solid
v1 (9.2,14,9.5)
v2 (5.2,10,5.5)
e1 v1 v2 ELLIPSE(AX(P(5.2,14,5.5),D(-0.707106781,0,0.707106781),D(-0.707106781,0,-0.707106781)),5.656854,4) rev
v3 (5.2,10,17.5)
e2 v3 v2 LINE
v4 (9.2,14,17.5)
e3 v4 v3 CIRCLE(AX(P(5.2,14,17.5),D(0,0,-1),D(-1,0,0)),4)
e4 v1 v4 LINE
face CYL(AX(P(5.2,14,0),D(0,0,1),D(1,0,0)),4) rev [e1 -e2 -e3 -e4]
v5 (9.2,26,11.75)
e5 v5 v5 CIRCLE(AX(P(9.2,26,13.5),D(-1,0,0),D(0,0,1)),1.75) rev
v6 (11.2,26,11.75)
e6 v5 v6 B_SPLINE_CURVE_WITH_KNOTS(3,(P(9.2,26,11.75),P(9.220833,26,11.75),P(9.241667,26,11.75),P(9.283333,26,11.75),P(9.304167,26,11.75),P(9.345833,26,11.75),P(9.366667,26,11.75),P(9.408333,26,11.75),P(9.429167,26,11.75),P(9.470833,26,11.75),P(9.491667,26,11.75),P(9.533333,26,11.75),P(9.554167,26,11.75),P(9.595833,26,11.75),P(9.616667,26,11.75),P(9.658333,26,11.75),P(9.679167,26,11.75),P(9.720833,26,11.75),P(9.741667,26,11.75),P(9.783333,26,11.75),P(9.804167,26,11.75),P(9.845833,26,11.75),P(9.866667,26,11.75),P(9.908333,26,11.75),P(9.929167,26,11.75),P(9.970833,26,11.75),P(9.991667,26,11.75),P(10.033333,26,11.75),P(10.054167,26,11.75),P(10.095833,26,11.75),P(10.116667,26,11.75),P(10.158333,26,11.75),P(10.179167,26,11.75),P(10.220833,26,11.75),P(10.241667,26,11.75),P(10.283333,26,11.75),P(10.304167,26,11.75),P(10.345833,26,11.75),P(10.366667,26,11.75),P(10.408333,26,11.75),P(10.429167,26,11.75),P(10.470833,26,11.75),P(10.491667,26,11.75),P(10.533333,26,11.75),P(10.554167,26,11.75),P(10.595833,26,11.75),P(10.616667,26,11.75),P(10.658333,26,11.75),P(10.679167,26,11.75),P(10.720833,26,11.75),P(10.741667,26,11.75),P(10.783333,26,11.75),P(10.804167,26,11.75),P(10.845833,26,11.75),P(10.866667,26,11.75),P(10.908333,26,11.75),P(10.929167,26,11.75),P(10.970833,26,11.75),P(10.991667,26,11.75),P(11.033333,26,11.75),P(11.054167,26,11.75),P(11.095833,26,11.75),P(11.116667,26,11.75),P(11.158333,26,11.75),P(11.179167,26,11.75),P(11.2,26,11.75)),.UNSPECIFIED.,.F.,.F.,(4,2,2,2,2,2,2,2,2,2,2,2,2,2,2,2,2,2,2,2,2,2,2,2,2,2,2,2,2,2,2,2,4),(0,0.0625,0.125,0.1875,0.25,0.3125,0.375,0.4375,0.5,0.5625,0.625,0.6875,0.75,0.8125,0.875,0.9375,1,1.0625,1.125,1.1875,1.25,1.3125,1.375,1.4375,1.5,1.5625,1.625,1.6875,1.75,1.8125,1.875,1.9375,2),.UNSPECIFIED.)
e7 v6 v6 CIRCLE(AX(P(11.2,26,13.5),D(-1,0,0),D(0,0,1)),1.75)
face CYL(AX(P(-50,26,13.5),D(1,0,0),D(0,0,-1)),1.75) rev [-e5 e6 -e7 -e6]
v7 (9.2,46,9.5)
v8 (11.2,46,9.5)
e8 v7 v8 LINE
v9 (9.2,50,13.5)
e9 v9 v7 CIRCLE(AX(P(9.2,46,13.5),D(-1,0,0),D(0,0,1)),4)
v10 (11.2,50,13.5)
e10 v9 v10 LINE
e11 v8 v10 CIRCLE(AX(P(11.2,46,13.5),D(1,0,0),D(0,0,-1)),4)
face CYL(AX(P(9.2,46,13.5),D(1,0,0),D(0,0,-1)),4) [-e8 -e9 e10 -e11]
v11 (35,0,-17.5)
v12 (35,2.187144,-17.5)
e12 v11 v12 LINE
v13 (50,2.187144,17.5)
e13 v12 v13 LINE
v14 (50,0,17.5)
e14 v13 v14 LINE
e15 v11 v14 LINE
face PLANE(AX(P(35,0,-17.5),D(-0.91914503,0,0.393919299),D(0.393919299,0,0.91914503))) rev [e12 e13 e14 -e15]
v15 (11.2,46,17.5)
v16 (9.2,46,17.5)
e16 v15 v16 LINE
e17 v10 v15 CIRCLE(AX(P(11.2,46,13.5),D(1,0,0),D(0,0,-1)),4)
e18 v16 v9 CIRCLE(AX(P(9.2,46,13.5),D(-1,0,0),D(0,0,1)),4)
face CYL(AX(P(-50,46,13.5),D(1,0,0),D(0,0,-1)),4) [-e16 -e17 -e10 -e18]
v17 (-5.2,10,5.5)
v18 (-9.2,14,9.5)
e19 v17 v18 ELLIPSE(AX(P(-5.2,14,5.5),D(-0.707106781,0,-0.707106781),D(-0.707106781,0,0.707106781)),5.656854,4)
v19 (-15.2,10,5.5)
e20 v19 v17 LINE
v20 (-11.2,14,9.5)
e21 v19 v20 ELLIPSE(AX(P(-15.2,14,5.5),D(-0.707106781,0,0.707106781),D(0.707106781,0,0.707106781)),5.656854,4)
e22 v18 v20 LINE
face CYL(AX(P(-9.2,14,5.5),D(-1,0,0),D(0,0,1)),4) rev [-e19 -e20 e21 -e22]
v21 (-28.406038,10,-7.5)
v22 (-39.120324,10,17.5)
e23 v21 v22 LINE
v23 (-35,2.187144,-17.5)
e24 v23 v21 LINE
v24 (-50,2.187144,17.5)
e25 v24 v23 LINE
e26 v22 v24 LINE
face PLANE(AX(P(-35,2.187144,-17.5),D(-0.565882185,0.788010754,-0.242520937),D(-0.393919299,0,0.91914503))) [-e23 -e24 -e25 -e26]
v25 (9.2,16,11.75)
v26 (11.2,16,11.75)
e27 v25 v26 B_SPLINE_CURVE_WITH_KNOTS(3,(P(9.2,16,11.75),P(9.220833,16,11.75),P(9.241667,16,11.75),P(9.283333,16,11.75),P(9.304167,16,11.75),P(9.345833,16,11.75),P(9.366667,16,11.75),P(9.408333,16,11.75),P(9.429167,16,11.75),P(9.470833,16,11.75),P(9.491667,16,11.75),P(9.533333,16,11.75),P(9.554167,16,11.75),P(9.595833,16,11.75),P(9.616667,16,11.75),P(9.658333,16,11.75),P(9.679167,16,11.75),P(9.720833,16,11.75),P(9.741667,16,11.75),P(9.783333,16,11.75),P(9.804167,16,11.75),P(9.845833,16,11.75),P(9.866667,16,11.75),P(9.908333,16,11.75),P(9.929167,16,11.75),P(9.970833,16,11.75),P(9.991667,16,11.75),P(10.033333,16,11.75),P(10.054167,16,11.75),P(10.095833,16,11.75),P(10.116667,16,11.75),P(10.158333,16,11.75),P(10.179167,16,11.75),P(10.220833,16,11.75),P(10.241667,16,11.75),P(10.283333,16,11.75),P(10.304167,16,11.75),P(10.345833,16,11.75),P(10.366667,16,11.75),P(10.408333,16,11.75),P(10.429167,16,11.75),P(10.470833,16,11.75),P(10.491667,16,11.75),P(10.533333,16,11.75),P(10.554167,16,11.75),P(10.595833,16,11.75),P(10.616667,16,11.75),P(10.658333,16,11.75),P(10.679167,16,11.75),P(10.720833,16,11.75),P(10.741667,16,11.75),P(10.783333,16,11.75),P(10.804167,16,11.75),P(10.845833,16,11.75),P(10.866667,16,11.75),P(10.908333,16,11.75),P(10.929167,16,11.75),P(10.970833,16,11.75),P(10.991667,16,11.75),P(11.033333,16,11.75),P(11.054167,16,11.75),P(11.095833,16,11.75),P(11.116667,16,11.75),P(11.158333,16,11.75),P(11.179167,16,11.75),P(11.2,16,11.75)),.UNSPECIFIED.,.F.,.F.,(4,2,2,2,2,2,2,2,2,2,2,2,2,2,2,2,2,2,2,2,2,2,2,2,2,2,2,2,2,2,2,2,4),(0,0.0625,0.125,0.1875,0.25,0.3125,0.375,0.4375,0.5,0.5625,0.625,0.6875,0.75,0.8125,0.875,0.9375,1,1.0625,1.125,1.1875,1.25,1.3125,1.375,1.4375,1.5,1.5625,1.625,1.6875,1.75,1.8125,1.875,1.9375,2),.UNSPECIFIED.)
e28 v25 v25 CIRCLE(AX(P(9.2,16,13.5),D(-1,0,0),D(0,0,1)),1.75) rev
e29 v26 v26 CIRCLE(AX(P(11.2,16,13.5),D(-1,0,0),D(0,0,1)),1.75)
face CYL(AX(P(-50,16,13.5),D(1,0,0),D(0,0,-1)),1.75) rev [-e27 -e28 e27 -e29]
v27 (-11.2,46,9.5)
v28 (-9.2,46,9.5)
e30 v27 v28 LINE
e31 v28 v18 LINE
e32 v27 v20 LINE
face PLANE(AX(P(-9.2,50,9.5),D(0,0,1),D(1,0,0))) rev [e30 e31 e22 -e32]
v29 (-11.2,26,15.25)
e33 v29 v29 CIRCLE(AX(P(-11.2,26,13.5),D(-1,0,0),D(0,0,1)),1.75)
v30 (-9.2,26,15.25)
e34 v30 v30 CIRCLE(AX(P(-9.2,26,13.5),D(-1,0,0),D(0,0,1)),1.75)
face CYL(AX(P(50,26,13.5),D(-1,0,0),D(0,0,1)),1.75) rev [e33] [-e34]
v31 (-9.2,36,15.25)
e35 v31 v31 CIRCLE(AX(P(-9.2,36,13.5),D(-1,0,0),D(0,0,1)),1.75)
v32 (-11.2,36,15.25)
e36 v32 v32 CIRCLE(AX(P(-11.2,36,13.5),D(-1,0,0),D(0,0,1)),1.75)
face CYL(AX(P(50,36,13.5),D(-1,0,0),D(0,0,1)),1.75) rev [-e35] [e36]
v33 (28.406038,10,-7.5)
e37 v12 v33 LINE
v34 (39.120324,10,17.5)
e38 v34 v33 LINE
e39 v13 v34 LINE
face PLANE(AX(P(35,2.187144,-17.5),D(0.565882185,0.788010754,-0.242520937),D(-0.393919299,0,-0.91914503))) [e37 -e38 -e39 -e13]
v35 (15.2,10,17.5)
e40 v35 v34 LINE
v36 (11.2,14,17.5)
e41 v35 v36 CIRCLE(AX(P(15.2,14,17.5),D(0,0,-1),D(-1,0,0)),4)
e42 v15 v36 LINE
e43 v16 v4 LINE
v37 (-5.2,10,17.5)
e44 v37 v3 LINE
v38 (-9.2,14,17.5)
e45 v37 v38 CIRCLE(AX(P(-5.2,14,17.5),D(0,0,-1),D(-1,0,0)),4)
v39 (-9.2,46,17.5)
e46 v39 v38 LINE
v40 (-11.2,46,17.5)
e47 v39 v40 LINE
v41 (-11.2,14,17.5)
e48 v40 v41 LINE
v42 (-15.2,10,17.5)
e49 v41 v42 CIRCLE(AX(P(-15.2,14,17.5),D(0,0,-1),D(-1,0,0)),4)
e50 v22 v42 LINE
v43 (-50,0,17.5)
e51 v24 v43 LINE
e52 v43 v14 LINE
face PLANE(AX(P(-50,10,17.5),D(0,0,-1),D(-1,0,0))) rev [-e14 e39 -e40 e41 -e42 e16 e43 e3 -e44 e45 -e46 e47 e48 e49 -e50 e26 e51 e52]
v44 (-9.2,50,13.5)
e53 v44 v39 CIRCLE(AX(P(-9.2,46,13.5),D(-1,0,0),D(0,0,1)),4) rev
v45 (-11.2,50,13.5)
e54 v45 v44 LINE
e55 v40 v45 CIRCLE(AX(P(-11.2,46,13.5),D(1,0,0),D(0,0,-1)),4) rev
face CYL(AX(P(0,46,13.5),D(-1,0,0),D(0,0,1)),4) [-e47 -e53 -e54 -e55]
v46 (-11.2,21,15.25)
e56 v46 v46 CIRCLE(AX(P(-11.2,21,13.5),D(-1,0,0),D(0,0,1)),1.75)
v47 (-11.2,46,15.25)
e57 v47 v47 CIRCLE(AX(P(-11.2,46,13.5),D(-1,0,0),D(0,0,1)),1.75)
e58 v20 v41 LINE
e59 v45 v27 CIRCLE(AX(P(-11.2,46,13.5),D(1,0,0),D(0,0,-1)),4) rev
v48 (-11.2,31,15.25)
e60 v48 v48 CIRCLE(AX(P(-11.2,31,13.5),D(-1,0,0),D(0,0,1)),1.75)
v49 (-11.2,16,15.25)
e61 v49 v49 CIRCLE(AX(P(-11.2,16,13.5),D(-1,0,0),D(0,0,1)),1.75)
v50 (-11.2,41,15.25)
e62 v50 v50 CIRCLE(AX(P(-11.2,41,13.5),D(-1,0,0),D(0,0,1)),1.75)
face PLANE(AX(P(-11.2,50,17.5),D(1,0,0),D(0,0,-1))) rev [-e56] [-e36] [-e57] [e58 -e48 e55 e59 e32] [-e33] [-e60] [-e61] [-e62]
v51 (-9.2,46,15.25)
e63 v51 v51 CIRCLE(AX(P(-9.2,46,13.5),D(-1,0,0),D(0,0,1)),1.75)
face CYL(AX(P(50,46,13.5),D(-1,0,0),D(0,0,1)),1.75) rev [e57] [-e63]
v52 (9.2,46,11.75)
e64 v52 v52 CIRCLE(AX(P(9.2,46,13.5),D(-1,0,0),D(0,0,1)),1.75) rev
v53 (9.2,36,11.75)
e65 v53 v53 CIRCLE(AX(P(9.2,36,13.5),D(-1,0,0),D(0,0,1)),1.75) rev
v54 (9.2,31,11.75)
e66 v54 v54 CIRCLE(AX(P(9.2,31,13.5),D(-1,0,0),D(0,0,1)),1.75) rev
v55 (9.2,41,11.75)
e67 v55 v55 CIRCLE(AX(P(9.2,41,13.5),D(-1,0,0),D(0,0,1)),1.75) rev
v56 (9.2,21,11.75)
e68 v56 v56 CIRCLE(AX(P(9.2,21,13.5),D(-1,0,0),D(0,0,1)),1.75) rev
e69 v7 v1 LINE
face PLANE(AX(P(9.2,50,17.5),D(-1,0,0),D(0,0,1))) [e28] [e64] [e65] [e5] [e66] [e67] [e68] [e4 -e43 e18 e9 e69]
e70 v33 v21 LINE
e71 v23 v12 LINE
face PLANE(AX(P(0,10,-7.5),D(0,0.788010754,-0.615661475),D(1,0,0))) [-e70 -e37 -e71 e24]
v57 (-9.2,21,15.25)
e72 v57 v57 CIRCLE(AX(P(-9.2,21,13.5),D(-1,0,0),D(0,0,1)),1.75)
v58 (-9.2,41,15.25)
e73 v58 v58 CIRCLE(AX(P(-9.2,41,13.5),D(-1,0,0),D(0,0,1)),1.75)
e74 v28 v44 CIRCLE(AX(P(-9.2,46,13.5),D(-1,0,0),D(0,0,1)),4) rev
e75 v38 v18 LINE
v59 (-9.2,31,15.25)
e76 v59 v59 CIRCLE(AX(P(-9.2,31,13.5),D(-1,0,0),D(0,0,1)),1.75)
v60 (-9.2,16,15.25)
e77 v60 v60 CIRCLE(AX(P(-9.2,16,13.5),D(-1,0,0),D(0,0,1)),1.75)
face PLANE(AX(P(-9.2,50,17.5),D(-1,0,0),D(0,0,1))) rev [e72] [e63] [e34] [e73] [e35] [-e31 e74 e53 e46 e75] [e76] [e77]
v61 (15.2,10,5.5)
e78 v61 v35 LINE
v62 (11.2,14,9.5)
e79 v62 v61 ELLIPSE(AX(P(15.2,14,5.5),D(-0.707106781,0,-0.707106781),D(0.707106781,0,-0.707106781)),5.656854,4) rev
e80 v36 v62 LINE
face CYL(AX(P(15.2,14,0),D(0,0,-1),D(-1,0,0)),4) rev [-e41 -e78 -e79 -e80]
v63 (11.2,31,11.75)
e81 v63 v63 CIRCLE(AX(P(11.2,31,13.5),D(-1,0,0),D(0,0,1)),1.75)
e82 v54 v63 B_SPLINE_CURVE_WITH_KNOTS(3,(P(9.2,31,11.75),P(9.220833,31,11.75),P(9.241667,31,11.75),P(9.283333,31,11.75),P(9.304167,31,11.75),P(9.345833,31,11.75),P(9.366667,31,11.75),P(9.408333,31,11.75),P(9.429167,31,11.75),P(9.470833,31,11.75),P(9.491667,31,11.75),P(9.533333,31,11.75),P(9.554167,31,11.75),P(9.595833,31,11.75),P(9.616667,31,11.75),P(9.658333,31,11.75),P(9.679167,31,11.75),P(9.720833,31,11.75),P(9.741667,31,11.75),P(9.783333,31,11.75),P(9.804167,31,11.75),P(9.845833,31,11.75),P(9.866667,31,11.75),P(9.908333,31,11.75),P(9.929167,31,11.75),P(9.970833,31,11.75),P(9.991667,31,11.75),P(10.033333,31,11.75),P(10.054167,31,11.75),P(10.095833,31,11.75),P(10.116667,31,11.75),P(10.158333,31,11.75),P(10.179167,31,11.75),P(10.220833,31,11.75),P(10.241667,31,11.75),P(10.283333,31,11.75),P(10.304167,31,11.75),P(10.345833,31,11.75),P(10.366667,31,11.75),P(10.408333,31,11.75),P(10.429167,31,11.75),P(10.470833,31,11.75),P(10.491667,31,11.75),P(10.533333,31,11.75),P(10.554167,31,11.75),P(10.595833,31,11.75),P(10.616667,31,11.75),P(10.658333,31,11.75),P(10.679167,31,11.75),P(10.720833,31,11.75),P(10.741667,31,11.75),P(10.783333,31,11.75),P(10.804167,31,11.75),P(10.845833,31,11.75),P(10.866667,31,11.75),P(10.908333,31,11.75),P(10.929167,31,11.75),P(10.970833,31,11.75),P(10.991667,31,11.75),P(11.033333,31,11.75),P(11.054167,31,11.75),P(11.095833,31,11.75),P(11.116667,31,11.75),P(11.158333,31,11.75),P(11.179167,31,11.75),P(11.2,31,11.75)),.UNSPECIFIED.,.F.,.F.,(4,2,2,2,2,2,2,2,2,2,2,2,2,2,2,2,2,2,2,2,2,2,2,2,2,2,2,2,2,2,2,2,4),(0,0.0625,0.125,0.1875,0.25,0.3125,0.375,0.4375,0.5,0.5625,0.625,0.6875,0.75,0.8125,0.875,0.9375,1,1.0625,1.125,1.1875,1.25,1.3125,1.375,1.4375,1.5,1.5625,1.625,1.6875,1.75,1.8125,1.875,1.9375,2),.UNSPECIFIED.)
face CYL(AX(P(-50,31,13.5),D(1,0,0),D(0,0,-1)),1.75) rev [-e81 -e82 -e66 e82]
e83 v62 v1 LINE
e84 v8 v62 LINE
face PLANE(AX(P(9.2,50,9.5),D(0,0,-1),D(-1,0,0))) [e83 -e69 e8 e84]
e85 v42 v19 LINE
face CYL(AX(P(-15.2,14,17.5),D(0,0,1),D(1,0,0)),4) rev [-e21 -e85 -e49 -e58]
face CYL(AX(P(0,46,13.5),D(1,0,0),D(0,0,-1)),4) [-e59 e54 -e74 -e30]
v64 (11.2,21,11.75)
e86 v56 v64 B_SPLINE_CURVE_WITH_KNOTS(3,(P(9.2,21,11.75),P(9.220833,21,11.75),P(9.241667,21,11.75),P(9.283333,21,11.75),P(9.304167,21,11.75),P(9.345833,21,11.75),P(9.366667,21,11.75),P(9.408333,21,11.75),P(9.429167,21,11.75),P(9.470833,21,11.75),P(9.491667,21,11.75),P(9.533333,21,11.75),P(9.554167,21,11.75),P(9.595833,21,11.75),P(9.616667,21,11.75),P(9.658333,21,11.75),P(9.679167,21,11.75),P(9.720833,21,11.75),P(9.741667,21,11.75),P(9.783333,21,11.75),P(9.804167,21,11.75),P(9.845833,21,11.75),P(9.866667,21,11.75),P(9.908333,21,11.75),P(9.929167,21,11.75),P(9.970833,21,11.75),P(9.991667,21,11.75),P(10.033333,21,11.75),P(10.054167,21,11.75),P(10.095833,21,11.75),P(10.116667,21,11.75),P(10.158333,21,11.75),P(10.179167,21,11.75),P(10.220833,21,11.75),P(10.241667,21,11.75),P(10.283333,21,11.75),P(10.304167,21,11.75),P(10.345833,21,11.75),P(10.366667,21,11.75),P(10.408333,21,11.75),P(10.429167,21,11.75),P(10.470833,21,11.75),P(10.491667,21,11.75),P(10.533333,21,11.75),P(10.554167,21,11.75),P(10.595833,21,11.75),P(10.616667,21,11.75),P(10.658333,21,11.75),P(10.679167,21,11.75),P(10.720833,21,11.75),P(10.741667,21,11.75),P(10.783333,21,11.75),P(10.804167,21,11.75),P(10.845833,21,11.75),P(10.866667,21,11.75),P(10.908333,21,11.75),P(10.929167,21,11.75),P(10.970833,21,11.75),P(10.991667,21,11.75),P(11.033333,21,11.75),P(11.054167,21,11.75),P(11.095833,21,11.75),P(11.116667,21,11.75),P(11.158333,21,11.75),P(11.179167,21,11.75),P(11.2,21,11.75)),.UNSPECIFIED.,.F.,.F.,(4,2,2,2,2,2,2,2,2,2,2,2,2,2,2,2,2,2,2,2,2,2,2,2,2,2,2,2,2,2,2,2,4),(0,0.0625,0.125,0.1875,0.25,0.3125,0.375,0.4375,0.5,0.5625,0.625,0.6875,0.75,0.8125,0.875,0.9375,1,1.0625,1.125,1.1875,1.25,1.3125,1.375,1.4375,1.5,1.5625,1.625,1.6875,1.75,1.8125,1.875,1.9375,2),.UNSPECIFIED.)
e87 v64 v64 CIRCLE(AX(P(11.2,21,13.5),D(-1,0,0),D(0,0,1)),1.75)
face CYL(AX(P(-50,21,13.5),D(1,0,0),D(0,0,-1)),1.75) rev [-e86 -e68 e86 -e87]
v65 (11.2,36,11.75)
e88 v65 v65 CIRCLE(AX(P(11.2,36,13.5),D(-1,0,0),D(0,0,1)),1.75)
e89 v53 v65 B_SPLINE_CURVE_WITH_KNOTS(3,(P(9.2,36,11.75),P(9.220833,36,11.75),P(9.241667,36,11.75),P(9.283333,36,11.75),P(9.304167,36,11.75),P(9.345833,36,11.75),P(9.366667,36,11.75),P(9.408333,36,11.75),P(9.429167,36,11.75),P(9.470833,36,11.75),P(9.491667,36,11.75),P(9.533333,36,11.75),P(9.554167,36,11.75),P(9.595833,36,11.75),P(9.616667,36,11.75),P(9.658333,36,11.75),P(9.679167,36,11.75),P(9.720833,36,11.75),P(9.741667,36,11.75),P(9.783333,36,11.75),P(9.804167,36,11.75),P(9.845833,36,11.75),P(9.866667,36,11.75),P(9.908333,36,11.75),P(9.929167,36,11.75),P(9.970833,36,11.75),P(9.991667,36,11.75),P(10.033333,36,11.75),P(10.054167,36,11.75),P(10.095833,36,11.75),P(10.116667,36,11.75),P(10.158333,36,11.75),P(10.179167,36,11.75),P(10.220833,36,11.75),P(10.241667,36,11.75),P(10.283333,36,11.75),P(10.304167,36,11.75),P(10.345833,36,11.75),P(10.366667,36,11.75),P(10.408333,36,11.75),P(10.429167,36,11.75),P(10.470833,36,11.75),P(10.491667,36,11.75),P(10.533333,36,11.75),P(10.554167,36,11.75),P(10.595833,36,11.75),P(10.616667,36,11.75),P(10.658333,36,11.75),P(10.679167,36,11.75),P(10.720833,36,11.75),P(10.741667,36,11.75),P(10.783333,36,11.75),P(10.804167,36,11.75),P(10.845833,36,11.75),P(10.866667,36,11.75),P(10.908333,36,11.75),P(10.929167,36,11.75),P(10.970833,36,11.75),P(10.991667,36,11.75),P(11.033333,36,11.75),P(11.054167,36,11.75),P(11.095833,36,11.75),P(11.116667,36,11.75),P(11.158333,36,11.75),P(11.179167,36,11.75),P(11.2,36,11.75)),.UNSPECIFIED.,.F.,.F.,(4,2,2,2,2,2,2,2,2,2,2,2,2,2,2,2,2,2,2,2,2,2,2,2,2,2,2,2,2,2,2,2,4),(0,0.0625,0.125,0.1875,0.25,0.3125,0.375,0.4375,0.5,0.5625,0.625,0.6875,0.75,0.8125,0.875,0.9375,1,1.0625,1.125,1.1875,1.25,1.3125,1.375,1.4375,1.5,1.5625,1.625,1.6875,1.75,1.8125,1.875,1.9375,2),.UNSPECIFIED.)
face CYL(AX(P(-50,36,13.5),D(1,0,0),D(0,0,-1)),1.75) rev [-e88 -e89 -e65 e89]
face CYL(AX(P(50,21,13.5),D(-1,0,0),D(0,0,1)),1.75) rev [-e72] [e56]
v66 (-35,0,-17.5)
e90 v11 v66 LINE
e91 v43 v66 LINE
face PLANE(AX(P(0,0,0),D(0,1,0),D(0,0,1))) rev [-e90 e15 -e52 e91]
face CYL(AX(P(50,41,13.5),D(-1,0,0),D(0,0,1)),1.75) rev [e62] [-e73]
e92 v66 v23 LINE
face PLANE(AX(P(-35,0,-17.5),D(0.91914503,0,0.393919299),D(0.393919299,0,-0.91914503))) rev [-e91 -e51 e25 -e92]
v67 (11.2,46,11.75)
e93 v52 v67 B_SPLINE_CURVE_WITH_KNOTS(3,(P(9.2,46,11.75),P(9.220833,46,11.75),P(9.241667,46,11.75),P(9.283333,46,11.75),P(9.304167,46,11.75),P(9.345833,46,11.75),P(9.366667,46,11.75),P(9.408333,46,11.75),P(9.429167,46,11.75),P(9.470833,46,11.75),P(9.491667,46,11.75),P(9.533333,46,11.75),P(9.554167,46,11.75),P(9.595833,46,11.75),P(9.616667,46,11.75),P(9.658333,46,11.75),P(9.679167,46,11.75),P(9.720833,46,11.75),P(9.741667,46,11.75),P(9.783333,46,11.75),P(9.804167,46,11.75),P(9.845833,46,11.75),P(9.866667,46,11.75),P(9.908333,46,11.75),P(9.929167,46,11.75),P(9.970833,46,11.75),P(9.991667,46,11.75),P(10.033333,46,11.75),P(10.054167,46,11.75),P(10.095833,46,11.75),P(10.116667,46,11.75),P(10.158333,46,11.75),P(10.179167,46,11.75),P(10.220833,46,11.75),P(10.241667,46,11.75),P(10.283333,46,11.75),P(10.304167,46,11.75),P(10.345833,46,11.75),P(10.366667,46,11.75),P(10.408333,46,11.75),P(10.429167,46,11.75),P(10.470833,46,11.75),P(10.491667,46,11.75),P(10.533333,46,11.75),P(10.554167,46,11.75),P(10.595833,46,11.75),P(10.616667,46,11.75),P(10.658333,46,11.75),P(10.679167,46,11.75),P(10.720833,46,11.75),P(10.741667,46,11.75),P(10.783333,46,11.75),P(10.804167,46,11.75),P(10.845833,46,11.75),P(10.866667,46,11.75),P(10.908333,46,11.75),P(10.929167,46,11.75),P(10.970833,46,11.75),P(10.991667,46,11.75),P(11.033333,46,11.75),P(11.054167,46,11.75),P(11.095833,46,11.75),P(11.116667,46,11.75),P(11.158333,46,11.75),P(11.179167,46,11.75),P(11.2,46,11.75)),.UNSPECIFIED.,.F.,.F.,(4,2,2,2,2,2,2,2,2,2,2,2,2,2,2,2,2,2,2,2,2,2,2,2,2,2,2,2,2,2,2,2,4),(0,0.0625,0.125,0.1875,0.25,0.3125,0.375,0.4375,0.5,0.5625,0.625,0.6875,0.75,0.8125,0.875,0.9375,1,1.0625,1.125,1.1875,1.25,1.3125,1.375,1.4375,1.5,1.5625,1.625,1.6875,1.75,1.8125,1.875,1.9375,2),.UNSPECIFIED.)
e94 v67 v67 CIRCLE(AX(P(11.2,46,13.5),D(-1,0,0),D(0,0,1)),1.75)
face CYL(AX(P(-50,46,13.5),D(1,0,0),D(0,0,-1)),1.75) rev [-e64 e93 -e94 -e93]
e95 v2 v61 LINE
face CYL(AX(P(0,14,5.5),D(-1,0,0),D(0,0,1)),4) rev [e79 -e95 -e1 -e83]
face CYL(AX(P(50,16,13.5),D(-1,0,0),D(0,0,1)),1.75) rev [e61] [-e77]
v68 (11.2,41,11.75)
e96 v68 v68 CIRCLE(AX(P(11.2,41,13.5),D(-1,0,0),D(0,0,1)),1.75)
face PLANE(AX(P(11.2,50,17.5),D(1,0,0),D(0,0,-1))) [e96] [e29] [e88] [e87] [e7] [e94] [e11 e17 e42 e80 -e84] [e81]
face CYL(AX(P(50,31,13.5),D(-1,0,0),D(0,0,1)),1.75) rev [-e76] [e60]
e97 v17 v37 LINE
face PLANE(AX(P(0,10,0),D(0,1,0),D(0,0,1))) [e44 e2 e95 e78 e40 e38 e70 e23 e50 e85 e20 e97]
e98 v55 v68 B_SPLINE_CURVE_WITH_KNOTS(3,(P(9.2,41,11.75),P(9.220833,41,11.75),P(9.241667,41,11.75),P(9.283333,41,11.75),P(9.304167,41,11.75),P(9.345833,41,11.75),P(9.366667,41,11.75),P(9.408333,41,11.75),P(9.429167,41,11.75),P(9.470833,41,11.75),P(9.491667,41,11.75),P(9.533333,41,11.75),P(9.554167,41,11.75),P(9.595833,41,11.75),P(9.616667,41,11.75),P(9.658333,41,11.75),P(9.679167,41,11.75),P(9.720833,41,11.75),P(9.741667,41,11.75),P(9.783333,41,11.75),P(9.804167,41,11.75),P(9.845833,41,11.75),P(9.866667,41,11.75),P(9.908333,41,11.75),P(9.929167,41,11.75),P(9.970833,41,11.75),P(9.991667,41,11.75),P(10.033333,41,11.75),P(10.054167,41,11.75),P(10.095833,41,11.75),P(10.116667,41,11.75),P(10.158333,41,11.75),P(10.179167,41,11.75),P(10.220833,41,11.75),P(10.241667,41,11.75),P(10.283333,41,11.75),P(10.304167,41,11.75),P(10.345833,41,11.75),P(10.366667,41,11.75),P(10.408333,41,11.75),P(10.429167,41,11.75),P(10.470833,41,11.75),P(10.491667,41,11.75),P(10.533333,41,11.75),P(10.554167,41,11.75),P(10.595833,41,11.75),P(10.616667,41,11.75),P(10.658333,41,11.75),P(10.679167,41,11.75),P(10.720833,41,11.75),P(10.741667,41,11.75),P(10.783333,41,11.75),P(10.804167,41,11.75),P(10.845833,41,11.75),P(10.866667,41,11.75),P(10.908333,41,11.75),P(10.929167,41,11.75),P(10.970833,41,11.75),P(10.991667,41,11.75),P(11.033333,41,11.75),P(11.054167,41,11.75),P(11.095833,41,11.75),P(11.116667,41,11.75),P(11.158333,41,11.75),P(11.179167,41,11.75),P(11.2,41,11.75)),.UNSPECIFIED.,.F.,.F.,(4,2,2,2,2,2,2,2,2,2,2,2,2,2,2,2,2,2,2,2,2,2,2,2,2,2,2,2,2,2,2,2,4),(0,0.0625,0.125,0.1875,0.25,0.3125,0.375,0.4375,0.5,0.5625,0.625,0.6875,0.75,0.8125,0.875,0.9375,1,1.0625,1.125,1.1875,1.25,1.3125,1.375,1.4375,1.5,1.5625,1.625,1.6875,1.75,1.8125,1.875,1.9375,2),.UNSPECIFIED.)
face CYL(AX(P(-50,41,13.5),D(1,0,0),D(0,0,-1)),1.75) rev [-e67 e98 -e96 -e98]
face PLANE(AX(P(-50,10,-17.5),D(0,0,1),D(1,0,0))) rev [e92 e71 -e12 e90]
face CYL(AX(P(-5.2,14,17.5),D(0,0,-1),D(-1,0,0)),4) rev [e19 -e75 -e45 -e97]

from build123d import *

# Parameters (mm, degrees)
SKETCH1_W               = 100
SKETCH1_H               = 35
BOSS_EXTRUDE1_DEPTH     = 10
CUT_EXTRUDE1_DEPTH      = 54.909646632
CHAMFER1_SIZE           = 10
CHAMFER1_SIZE2          = 7.812856265
SKETCH3_W               = 2
SKETCH3_H               = 8
BOSS_EXTRUDE2_DEPTH     = 40
FILLET1_R               = 4
SKETCH4_R               = 1.75
CUT_EXTRUDE2_DEPTH      = 81.942510463
LPATTERN1_COUNT         = 7
LPATTERN1_PITCH         = 5
MIRROR1_COPY_1_SKETCH_R = 1.75
MIRROR1_COPY_1_DEPTH    = 81.942510463
MIRROR1_COPY_2_SKETCH_R = 1.75
MIRROR1_COPY_2_DEPTH    = 81.942510463
MIRROR1_COPY_3_SKETCH_R = 1.75
MIRROR1_COPY_3_DEPTH    = 81.942510463
MIRROR1_COPY_4_SKETCH_R = 1.75
MIRROR1_COPY_4_DEPTH    = 81.942510463
MIRROR1_COPY_5_SKETCH_R = 1.75
MIRROR1_COPY_5_DEPTH    = 81.942510463
MIRROR1_COPY_6_SKETCH_R = 1.75
MIRROR1_COPY_6_DEPTH    = 81.942510463
FILLET1_OF_MIRROR1_R    = 4
FILLET2_R               = 4


with BuildPart() as part:
    # Sketch1 → Boss-Extrude1 (new body)
    with BuildSketch(Plane(origin=(0, 0, 0), x_dir=(1, 0, 0), z_dir=(0, 1, 0))):
        Rectangle(SKETCH1_W, SKETCH1_H)
    extrude(amount=BOSS_EXTRUDE1_DEPTH)

    # Sketch2 → Cut-Extrude1 (cut, through all)
    with BuildSketch(Plane(origin=(0, 10, 0), x_dir=(1, 0, 0), z_dir=(0, 1, 0))):
        Polygon((-50, 17.5), (-35, 17.5), (-50, -17.5), align=None)
        Polygon((50, 17.5), (35, 17.5), (50, -17.5), align=None)
    extrude(amount=-CUT_EXTRUDE1_DEPTH, mode=Mode.SUBTRACT)

    # Chamfer1
    chamfer1_edges = [part.edges().sort_by_distance(p)[0] for p in [
        (0, 10, -17.5),
        (-42.5, 10, 0),
        (42.5, 10, 0),
    ]]
    chamfer1_side = [part.faces().sort_by_distance(p)[0] for p in [
        (0, 10, 1.029411765),
    ]]
    chamfer(chamfer1_edges, length=CHAMFER1_SIZE, length2=CHAMFER1_SIZE2, reference=chamfer1_side[0])

    # Sketch3 → Boss-Extrude2 (add)
    with BuildSketch(Plane(origin=(0, 10, 0), x_dir=(1, 0, 0), z_dir=(0, 1, 0))):
        with Locations((-10.2, -13.5)):
            Rectangle(SKETCH3_W, SKETCH3_H)
    boss_extrude2 = extrude(amount=BOSS_EXTRUDE2_DEPTH)

    # Fillet1
    fillet1_edges = [part.edges().sort_by_distance(p)[0] for p in [
        (-10.2, 50, 9.5),
        (-10.2, 50, 17.5),
    ]]
    fillet(fillet1_edges, radius=FILLET1_R - 0.0001)  # a hair under: the kernel refuses the full size

    # Sketch4 → Cut-Extrude2 (cut, through all)
    with BuildSketch(Plane.ZY.offset(11.2)):
        with Locations((13.5, 46)):
            Circle(SKETCH4_R)
    cut_extrude2 = extrude(amount=-CUT_EXTRUDE2_DEPTH, mode=Mode.SUBTRACT)

    # LPattern1: Cut-Extrude2 ×7
    with Locations(*[(0, -i * LPATTERN1_PITCH, 0) for i in range(1, LPATTERN1_COUNT)]):
        add(cut_extrude2, mode=Mode.SUBTRACT)

    # Mirror1: Boss-Extrude2, Cut-Extrude2 across plane
    add(boss_extrude2.mirror(Plane(origin=(0, 0, 0), x_dir=(0, 0, 1), z_dir=(1, 0, 0))))
    add(cut_extrude2.mirror(Plane(origin=(0, 0, 0), x_dir=(0, 0, 1), z_dir=(1, 0, 0))), mode=Mode.SUBTRACT)

    # Mirror1 copy 1 sketch → Mirror1 copy 1 (cut, through all)
    with BuildSketch(Plane(origin=(11.2, -5, 0), x_dir=(0, 0, 1), z_dir=(1, 0, 0))):
        with Locations((13.5, -46)):
            Circle(MIRROR1_COPY_1_SKETCH_R)
    extrude(amount=-MIRROR1_COPY_1_DEPTH, mode=Mode.SUBTRACT)

    # Mirror1 copy 2 sketch → Mirror1 copy 2 (cut, through all)
    with BuildSketch(Plane(origin=(11.2, -10, 0), x_dir=(0, 0, 1), z_dir=(1, 0, 0))):
        with Locations((13.5, -46)):
            Circle(MIRROR1_COPY_2_SKETCH_R)
    extrude(amount=-MIRROR1_COPY_2_DEPTH, mode=Mode.SUBTRACT)

    # Mirror1 copy 3 sketch → Mirror1 copy 3 (cut, through all)
    with BuildSketch(Plane(origin=(11.2, -15, 0), x_dir=(0, 0, 1), z_dir=(1, 0, 0))):
        with Locations((13.5, -46)):
            Circle(MIRROR1_COPY_3_SKETCH_R)
    extrude(amount=-MIRROR1_COPY_3_DEPTH, mode=Mode.SUBTRACT)

    # Mirror1 copy 4 sketch → Mirror1 copy 4 (cut, through all)
    with BuildSketch(Plane(origin=(11.2, -20, 0), x_dir=(0, 0, 1), z_dir=(1, 0, 0))):
        with Locations((13.5, -46)):
            Circle(MIRROR1_COPY_4_SKETCH_R)
    extrude(amount=-MIRROR1_COPY_4_DEPTH, mode=Mode.SUBTRACT)

    # Mirror1 copy 5 sketch → Mirror1 copy 5 (cut, through all)
    with BuildSketch(Plane(origin=(11.2, -25, 0), x_dir=(0, 0, 1), z_dir=(1, 0, 0))):
        with Locations((13.5, -46)):
            Circle(MIRROR1_COPY_5_SKETCH_R)
    extrude(amount=-MIRROR1_COPY_5_DEPTH, mode=Mode.SUBTRACT)

    # Mirror1 copy 6 sketch → Mirror1 copy 6 (cut, through all)
    with BuildSketch(Plane(origin=(11.2, -30, 0), x_dir=(0, 0, 1), z_dir=(1, 0, 0))):
        with Locations((13.5, -46)):
            Circle(MIRROR1_COPY_6_SKETCH_R)
    extrude(amount=-MIRROR1_COPY_6_DEPTH, mode=Mode.SUBTRACT)

    # Fillet1 of Mirror1
    fillet1_of_mirror1_edges = [part.edges().sort_by_distance(p)[0] for p in [
        (10.2, 50, 9.5),
        (10.2, 50, 17.5),
    ]]
    fillet(fillet1_of_mirror1_edges, radius=FILLET1_OF_MIRROR1_R - 0.0001)  # a hair under: the kernel refuses the full size

    # Fillet2
    fillet2_edges = [part.edges().sort_by_distance(p)[0] for p in [
        (9.2, 10, 13.5),
        (10.2, 10, 9.5),
        (11.2, 10, 13.5),
        (-9.2, 10, 13.5),
        (-10.2, 10, 9.5),
        (-11.2, 10, 13.5),
    ]]
    fillet(fillet2_edges, radius=FILLET2_R)


solid = part.part
